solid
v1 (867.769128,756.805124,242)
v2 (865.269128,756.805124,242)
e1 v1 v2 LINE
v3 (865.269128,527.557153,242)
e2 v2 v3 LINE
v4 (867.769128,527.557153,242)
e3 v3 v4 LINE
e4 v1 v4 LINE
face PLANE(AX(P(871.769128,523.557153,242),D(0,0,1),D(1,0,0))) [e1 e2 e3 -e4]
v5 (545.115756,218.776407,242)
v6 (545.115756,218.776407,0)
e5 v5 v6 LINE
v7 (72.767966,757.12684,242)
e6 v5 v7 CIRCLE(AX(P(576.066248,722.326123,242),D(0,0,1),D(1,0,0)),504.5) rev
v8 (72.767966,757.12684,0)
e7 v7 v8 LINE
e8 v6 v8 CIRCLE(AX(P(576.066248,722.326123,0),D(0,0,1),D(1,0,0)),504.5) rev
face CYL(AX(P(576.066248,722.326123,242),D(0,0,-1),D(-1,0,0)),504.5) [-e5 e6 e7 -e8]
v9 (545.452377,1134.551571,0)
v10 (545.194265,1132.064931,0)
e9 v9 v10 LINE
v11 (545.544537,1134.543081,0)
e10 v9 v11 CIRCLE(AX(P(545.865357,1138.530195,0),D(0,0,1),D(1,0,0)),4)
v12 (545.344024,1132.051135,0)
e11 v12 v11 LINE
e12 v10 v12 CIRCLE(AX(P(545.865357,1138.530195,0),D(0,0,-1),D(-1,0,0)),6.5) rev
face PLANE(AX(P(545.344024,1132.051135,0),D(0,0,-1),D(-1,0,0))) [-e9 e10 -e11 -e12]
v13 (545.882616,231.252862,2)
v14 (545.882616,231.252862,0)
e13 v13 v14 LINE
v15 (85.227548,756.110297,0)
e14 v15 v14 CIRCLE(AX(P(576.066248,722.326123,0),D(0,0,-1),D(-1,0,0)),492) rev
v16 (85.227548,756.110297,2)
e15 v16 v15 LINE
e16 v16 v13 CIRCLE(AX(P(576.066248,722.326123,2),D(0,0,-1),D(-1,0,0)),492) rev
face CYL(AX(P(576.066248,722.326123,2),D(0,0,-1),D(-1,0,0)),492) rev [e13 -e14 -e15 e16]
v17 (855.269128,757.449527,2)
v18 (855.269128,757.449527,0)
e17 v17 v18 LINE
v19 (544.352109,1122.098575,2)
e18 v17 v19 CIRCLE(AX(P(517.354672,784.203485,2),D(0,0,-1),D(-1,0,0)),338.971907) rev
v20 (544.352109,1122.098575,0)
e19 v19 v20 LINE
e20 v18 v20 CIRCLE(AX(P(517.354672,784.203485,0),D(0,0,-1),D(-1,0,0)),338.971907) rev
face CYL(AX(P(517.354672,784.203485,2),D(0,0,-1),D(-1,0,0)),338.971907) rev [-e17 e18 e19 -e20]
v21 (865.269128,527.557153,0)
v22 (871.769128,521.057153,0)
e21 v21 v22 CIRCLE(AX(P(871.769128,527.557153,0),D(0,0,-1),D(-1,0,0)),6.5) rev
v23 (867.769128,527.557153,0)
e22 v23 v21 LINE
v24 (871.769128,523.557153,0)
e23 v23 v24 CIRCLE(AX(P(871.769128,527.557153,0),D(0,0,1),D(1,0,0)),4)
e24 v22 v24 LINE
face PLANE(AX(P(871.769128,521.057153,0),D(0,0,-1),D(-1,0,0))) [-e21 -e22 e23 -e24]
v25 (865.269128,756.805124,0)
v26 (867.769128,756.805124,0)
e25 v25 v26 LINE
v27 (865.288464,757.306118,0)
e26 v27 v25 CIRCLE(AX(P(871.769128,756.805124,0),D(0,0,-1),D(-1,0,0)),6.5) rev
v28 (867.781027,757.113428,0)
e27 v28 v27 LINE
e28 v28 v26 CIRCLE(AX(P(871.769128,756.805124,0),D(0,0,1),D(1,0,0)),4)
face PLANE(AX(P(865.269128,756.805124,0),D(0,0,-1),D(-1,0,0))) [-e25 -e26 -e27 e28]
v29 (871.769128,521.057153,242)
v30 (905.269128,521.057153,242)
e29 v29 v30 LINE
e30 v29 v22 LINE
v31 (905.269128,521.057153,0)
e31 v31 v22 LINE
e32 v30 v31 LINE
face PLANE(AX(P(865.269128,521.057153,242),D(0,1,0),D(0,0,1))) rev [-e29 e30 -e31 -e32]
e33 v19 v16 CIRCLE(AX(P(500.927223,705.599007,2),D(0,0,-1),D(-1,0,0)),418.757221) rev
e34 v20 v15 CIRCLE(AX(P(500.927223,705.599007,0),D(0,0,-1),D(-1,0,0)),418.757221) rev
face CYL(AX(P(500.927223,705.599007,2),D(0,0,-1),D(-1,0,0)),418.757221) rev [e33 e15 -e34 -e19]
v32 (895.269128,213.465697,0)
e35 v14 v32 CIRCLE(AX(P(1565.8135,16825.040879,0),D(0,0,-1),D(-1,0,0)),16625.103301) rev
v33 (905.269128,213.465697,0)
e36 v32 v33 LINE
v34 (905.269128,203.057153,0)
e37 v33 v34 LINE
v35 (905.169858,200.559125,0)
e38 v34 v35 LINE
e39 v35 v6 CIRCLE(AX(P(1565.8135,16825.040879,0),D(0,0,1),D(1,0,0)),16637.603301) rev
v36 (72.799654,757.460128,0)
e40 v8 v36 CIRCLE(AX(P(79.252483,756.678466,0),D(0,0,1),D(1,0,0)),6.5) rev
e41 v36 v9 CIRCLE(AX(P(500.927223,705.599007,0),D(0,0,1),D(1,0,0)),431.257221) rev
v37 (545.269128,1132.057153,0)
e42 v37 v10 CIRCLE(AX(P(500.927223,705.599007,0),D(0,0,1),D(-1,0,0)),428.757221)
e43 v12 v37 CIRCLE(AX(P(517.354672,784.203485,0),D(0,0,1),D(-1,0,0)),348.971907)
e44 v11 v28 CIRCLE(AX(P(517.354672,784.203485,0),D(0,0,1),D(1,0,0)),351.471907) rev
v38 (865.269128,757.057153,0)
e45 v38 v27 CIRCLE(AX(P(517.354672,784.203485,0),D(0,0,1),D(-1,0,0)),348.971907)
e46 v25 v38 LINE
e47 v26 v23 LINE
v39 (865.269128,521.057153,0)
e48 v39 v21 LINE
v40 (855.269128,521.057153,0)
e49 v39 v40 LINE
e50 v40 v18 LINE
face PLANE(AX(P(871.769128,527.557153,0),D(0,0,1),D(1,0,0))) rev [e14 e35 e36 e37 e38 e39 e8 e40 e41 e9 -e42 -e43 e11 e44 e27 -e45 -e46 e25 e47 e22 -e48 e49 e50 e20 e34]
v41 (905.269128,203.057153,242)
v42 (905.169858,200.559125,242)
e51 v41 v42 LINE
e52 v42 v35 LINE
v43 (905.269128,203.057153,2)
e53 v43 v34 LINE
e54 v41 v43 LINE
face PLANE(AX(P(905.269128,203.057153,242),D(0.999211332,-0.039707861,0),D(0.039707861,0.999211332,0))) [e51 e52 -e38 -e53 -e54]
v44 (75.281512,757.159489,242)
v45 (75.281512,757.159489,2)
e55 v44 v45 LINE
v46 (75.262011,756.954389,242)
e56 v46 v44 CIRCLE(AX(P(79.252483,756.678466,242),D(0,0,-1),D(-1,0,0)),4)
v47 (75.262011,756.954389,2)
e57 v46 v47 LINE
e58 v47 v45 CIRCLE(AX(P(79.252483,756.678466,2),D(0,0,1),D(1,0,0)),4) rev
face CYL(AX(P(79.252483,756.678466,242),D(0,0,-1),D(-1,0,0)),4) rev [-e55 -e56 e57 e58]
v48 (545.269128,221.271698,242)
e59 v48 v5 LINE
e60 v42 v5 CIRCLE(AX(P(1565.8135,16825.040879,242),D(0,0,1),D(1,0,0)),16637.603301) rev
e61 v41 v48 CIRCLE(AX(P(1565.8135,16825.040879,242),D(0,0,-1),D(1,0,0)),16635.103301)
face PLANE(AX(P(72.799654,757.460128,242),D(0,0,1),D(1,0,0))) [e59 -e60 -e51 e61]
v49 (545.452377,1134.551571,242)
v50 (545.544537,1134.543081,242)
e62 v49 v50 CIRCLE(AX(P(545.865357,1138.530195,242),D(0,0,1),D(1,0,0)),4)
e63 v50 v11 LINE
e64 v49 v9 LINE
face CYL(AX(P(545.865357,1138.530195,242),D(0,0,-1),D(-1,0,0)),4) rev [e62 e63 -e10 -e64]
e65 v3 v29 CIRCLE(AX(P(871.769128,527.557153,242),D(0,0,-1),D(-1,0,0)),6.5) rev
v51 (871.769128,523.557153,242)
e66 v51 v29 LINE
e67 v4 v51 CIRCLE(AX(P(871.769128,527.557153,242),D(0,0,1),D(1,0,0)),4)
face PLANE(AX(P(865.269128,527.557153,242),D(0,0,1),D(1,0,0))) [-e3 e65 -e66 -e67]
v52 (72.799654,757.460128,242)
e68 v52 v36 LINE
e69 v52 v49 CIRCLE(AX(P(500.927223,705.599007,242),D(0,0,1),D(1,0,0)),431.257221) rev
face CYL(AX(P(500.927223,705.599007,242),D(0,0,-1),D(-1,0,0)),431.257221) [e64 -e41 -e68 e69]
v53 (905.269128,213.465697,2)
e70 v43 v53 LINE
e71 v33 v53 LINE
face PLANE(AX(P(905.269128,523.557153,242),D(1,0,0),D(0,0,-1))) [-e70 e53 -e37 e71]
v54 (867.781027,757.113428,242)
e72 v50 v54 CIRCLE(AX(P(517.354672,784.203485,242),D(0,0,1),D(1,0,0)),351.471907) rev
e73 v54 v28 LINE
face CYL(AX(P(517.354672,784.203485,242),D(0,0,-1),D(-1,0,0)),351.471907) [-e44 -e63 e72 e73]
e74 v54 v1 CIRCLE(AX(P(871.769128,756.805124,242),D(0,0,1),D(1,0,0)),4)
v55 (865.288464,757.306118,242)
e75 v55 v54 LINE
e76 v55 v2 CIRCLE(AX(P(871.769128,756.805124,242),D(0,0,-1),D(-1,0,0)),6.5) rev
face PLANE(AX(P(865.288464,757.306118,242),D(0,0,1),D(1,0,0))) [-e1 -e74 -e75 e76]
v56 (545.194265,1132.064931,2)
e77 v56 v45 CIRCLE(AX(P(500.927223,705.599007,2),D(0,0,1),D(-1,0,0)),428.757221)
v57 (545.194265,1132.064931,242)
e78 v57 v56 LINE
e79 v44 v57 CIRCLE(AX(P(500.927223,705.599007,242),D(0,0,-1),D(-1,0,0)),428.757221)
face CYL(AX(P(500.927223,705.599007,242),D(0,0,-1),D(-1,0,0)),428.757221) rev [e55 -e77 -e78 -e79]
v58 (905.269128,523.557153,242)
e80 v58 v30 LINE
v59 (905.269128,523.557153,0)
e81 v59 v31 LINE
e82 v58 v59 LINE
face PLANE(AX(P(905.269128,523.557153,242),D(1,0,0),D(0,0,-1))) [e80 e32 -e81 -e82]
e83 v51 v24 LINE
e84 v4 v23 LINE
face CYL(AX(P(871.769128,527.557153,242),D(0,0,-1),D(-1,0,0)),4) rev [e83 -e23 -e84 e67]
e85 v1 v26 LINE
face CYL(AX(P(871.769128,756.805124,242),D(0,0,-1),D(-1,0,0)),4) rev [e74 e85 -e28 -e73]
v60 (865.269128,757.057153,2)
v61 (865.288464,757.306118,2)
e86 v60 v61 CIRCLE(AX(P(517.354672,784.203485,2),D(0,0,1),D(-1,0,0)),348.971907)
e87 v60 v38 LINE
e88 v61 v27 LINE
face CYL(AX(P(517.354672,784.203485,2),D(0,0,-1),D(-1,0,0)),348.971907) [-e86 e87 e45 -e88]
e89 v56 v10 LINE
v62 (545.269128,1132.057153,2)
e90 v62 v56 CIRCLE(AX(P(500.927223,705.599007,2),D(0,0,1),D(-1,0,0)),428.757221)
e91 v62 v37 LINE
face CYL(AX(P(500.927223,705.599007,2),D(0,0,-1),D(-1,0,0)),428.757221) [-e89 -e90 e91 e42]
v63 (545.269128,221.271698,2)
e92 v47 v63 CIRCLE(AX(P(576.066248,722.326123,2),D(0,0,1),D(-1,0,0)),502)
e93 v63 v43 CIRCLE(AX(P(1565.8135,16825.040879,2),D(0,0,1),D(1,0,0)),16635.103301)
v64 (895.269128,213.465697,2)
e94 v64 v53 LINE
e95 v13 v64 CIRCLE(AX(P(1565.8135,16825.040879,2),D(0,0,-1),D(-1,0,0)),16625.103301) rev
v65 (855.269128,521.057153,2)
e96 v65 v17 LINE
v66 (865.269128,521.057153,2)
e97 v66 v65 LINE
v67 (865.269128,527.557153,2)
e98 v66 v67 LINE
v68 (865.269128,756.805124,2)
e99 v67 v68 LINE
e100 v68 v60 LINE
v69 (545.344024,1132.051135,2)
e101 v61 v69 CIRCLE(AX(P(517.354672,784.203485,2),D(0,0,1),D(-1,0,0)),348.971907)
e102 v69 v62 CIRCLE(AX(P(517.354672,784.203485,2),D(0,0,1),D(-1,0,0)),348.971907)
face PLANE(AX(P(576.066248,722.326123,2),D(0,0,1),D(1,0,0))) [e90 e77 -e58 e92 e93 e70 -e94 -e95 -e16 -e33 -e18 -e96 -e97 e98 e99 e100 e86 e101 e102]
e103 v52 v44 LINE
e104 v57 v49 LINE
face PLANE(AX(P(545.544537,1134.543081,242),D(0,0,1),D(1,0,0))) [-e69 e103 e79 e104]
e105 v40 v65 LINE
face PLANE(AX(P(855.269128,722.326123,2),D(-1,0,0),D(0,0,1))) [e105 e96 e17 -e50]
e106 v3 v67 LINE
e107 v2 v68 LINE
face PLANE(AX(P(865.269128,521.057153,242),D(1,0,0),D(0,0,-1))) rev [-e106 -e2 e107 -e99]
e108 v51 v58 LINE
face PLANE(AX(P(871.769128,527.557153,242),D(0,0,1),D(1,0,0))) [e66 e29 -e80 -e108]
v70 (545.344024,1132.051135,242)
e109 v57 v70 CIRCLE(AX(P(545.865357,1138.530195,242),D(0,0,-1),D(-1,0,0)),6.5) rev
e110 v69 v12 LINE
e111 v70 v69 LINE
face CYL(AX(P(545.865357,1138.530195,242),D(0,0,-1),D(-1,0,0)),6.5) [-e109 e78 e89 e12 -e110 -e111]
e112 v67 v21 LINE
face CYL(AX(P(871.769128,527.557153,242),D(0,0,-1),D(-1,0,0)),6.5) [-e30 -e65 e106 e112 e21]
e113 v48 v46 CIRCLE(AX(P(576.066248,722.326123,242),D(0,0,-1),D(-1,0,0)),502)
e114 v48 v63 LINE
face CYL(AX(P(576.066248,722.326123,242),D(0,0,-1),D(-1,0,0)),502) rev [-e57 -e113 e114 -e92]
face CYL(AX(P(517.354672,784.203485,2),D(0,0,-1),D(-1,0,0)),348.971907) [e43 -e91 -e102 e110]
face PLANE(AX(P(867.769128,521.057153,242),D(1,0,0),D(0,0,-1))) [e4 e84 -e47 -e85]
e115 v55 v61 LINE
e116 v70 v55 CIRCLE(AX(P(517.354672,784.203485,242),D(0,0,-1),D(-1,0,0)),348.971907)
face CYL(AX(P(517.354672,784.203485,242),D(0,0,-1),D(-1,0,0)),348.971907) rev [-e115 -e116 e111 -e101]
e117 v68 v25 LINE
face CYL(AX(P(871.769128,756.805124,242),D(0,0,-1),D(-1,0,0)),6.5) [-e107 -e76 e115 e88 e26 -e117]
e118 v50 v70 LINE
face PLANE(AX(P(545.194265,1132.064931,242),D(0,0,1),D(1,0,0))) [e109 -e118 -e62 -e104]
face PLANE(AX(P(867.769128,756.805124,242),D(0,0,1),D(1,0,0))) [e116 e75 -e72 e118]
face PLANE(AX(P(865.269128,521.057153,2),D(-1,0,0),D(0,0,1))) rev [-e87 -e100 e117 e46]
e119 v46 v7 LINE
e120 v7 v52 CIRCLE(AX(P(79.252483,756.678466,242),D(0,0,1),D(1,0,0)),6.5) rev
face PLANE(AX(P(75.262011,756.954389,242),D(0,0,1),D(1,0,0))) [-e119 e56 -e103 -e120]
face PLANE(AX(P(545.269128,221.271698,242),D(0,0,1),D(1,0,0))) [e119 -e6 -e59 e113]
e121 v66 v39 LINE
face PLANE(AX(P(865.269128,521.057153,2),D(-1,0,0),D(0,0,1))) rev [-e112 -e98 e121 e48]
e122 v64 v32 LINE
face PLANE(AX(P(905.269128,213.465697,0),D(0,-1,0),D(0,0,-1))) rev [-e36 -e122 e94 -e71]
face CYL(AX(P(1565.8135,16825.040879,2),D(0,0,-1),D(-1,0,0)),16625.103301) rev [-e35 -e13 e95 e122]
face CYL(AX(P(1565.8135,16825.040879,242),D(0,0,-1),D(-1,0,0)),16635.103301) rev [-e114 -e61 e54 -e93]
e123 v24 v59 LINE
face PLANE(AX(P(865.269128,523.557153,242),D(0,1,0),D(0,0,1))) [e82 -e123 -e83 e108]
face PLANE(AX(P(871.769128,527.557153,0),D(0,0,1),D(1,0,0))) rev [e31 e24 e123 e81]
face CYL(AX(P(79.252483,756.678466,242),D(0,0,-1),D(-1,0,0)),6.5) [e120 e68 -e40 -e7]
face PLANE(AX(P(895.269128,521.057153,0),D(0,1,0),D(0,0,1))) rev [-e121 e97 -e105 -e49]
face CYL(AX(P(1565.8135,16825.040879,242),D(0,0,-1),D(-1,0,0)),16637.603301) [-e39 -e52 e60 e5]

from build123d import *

# Parameters (mm, degrees)
BASE_FLANGE1_DEPTH      = 242
EXTRUDE_THIN1_DEPTH     = 2
CUT_EXTRUDE3_DEPTH      = 1473.940690723
CUT_EXTRUDE3_DEPTH_BACK = 1473.940690723


# Read off the part's stored shape, not the designer's step: Base-Flange1
with BuildPart() as part:
    # Base-Flange1 outline → Base-Flange1 (new body)
    with BuildSketch(Plane.XY):
        with BuildLine():
            Line((871.769127642, 521.057153497), (905.269127642, 521.057153497))
            Line((905.269127642, 521.057153497), (905.269127642, 523.557153497))
            Line((905.269127642, 523.557153497), (871.769127642, 523.557153497))
            ThreePointArc((871.769127642, 523.557153497), (868.940700517, 524.728726372), (867.769127642, 527.557153497))
            Line((867.769127642, 527.557153497), (867.769127642, 756.805124112))
            ThreePointArc((867.769127642, 756.805124112), (867.77210353, 756.959390926), (867.781026767, 757.1134282))
            ThreePointArc((867.781026767, 757.1134282), (784.657582784, 1012.417540201), (545.544536696, 1134.54308108))
            ThreePointArc((545.544536696, 1134.54308108), (545.498432474, 1134.547059372), (545.45237736, 1134.551570763))
            ThreePointArc((545.45237736, 1134.551570763), (231.971479061, 1042.712636382), (72.799654121, 757.46012787))
            ThreePointArc((72.799654121, 757.46012787), (72.781664067, 757.29368801), (72.76796633, 757.126840052))
            ThreePointArc((72.76796633, 757.126840052), (196.842388714, 389.59572995), (545.115755529, 218.776406833))
            ThreePointArc((545.115755529, 218.776406833), (725.093462287, 208.692500871), (905.169857989, 200.559125168))
            Line((905.169857989, 200.559125168), (905.269127642, 203.057153497))
            ThreePointArc((905.269127642, 203.057153497), (725.219790585, 211.189307063), (545.269127642, 221.271697797))
            ThreePointArc((545.269127642, 221.271697797), (198.721595151, 391.244542603), (75.262011332, 756.954388532))
            ThreePointArc((75.262011332, 756.954388532), (75.270440709, 757.057064199), (75.281511511, 757.159488728))
            ThreePointArc((75.281511511, 757.159488728), (233.530616685, 1040.758387199), (545.194264845, 1132.064930876))
            ThreePointArc((545.194264845, 1132.064930876), (545.269104404, 1132.057599865), (545.344023766, 1132.051135141))
            ThreePointArc((545.344023766, 1132.051135141), (782.756272141, 1010.794266398), (865.28846372, 757.306118255))
            ThreePointArc((865.28846372, 757.306118255), (865.27396346, 757.055807685), (865.269127642, 756.805124112))
            Line((865.269127642, 756.805124112), (865.269127642, 527.557153497))
            ThreePointArc((865.269127642, 527.557153497), (867.172933564, 522.960959419), (871.769127642, 521.057153497))
        make_face()
    extrude(amount=BASE_FLANGE1_DEPTH)

    # Sketch9 → Extrude-Thin1 (add)
    with BuildSketch(Plane.XY):
        with BuildLine():
            Line((905.269127642, 203.057153497), (905.269127642, 521.057153497))
            Line((905.269127642, 521.057153497), (865.269127642, 521.057153497))
            Line((865.269127642, 521.057153497), (865.269127642, 757.057153497))
            ThreePointArc((865.269127642, 757.057153497), (782.812941082, 1010.7278743), (545.269127642, 1132.057153497))
            ThreePointArc((545.269127642, 1132.057153497), (233.519744905, 1040.749713195), (75.269127642, 757.057153497))
            ThreePointArc((75.269127642, 757.057153497), (198.687627947, 391.283260157), (545.269127642, 221.271697797))
            ThreePointArc((545.269127642, 221.271697797), (725.219790584, 211.189307063), (905.269127642, 203.057153497))
        make_face()
        with BuildLine():
            Line((895.269127642, 213.465697296), (895.269127642, 511.057153497))
            Line((895.269127642, 511.057153497), (855.269127642, 511.057153497))
            Line((855.269127642, 511.057153497), (855.269127642, 757.449526591))
            ThreePointArc((855.269127642, 757.449526591), (775.293432889, 1004.134267456), (544.352108556, 1122.098574947))
            ThreePointArc((544.352108556, 1122.098574947), (239.902349284, 1033.049195687), (85.227547592, 756.110297031))
            ThreePointArc((85.227547592, 756.110297031), (206.289423946, 397.781672568), (545.882616091, 231.252861653))
            ThreePointArc((545.882616091, 231.252861653), (720.529084068, 221.440244534), (895.269127642, 213.465697296))
        make_face(mode=Mode.SUBTRACT)
    extrude(amount=EXTRUDE_THIN1_DEPTH)

    # Sketch11 → Cut-Extrude3 (cut, two sides: drawn at the far end of the back side and taken through both)
    with BuildSketch(Plane.XY.offset(2).offset(-CUT_EXTRUDE3_DEPTH_BACK)):
        Polygon((905.269127642, 521.057153497), (895.269127642, 521.057153497), (855.269127642, 521.057153497), (855.269127642, 511.057153497), (895.269127642, 511.057153497), (895.269127642, 213.465697296), (905.269127642, 213.465697296), align=None)
    extrude(amount=CUT_EXTRUDE3_DEPTH + CUT_EXTRUDE3_DEPTH_BACK, mode=Mode.SUBTRACT)


solid = part.part
